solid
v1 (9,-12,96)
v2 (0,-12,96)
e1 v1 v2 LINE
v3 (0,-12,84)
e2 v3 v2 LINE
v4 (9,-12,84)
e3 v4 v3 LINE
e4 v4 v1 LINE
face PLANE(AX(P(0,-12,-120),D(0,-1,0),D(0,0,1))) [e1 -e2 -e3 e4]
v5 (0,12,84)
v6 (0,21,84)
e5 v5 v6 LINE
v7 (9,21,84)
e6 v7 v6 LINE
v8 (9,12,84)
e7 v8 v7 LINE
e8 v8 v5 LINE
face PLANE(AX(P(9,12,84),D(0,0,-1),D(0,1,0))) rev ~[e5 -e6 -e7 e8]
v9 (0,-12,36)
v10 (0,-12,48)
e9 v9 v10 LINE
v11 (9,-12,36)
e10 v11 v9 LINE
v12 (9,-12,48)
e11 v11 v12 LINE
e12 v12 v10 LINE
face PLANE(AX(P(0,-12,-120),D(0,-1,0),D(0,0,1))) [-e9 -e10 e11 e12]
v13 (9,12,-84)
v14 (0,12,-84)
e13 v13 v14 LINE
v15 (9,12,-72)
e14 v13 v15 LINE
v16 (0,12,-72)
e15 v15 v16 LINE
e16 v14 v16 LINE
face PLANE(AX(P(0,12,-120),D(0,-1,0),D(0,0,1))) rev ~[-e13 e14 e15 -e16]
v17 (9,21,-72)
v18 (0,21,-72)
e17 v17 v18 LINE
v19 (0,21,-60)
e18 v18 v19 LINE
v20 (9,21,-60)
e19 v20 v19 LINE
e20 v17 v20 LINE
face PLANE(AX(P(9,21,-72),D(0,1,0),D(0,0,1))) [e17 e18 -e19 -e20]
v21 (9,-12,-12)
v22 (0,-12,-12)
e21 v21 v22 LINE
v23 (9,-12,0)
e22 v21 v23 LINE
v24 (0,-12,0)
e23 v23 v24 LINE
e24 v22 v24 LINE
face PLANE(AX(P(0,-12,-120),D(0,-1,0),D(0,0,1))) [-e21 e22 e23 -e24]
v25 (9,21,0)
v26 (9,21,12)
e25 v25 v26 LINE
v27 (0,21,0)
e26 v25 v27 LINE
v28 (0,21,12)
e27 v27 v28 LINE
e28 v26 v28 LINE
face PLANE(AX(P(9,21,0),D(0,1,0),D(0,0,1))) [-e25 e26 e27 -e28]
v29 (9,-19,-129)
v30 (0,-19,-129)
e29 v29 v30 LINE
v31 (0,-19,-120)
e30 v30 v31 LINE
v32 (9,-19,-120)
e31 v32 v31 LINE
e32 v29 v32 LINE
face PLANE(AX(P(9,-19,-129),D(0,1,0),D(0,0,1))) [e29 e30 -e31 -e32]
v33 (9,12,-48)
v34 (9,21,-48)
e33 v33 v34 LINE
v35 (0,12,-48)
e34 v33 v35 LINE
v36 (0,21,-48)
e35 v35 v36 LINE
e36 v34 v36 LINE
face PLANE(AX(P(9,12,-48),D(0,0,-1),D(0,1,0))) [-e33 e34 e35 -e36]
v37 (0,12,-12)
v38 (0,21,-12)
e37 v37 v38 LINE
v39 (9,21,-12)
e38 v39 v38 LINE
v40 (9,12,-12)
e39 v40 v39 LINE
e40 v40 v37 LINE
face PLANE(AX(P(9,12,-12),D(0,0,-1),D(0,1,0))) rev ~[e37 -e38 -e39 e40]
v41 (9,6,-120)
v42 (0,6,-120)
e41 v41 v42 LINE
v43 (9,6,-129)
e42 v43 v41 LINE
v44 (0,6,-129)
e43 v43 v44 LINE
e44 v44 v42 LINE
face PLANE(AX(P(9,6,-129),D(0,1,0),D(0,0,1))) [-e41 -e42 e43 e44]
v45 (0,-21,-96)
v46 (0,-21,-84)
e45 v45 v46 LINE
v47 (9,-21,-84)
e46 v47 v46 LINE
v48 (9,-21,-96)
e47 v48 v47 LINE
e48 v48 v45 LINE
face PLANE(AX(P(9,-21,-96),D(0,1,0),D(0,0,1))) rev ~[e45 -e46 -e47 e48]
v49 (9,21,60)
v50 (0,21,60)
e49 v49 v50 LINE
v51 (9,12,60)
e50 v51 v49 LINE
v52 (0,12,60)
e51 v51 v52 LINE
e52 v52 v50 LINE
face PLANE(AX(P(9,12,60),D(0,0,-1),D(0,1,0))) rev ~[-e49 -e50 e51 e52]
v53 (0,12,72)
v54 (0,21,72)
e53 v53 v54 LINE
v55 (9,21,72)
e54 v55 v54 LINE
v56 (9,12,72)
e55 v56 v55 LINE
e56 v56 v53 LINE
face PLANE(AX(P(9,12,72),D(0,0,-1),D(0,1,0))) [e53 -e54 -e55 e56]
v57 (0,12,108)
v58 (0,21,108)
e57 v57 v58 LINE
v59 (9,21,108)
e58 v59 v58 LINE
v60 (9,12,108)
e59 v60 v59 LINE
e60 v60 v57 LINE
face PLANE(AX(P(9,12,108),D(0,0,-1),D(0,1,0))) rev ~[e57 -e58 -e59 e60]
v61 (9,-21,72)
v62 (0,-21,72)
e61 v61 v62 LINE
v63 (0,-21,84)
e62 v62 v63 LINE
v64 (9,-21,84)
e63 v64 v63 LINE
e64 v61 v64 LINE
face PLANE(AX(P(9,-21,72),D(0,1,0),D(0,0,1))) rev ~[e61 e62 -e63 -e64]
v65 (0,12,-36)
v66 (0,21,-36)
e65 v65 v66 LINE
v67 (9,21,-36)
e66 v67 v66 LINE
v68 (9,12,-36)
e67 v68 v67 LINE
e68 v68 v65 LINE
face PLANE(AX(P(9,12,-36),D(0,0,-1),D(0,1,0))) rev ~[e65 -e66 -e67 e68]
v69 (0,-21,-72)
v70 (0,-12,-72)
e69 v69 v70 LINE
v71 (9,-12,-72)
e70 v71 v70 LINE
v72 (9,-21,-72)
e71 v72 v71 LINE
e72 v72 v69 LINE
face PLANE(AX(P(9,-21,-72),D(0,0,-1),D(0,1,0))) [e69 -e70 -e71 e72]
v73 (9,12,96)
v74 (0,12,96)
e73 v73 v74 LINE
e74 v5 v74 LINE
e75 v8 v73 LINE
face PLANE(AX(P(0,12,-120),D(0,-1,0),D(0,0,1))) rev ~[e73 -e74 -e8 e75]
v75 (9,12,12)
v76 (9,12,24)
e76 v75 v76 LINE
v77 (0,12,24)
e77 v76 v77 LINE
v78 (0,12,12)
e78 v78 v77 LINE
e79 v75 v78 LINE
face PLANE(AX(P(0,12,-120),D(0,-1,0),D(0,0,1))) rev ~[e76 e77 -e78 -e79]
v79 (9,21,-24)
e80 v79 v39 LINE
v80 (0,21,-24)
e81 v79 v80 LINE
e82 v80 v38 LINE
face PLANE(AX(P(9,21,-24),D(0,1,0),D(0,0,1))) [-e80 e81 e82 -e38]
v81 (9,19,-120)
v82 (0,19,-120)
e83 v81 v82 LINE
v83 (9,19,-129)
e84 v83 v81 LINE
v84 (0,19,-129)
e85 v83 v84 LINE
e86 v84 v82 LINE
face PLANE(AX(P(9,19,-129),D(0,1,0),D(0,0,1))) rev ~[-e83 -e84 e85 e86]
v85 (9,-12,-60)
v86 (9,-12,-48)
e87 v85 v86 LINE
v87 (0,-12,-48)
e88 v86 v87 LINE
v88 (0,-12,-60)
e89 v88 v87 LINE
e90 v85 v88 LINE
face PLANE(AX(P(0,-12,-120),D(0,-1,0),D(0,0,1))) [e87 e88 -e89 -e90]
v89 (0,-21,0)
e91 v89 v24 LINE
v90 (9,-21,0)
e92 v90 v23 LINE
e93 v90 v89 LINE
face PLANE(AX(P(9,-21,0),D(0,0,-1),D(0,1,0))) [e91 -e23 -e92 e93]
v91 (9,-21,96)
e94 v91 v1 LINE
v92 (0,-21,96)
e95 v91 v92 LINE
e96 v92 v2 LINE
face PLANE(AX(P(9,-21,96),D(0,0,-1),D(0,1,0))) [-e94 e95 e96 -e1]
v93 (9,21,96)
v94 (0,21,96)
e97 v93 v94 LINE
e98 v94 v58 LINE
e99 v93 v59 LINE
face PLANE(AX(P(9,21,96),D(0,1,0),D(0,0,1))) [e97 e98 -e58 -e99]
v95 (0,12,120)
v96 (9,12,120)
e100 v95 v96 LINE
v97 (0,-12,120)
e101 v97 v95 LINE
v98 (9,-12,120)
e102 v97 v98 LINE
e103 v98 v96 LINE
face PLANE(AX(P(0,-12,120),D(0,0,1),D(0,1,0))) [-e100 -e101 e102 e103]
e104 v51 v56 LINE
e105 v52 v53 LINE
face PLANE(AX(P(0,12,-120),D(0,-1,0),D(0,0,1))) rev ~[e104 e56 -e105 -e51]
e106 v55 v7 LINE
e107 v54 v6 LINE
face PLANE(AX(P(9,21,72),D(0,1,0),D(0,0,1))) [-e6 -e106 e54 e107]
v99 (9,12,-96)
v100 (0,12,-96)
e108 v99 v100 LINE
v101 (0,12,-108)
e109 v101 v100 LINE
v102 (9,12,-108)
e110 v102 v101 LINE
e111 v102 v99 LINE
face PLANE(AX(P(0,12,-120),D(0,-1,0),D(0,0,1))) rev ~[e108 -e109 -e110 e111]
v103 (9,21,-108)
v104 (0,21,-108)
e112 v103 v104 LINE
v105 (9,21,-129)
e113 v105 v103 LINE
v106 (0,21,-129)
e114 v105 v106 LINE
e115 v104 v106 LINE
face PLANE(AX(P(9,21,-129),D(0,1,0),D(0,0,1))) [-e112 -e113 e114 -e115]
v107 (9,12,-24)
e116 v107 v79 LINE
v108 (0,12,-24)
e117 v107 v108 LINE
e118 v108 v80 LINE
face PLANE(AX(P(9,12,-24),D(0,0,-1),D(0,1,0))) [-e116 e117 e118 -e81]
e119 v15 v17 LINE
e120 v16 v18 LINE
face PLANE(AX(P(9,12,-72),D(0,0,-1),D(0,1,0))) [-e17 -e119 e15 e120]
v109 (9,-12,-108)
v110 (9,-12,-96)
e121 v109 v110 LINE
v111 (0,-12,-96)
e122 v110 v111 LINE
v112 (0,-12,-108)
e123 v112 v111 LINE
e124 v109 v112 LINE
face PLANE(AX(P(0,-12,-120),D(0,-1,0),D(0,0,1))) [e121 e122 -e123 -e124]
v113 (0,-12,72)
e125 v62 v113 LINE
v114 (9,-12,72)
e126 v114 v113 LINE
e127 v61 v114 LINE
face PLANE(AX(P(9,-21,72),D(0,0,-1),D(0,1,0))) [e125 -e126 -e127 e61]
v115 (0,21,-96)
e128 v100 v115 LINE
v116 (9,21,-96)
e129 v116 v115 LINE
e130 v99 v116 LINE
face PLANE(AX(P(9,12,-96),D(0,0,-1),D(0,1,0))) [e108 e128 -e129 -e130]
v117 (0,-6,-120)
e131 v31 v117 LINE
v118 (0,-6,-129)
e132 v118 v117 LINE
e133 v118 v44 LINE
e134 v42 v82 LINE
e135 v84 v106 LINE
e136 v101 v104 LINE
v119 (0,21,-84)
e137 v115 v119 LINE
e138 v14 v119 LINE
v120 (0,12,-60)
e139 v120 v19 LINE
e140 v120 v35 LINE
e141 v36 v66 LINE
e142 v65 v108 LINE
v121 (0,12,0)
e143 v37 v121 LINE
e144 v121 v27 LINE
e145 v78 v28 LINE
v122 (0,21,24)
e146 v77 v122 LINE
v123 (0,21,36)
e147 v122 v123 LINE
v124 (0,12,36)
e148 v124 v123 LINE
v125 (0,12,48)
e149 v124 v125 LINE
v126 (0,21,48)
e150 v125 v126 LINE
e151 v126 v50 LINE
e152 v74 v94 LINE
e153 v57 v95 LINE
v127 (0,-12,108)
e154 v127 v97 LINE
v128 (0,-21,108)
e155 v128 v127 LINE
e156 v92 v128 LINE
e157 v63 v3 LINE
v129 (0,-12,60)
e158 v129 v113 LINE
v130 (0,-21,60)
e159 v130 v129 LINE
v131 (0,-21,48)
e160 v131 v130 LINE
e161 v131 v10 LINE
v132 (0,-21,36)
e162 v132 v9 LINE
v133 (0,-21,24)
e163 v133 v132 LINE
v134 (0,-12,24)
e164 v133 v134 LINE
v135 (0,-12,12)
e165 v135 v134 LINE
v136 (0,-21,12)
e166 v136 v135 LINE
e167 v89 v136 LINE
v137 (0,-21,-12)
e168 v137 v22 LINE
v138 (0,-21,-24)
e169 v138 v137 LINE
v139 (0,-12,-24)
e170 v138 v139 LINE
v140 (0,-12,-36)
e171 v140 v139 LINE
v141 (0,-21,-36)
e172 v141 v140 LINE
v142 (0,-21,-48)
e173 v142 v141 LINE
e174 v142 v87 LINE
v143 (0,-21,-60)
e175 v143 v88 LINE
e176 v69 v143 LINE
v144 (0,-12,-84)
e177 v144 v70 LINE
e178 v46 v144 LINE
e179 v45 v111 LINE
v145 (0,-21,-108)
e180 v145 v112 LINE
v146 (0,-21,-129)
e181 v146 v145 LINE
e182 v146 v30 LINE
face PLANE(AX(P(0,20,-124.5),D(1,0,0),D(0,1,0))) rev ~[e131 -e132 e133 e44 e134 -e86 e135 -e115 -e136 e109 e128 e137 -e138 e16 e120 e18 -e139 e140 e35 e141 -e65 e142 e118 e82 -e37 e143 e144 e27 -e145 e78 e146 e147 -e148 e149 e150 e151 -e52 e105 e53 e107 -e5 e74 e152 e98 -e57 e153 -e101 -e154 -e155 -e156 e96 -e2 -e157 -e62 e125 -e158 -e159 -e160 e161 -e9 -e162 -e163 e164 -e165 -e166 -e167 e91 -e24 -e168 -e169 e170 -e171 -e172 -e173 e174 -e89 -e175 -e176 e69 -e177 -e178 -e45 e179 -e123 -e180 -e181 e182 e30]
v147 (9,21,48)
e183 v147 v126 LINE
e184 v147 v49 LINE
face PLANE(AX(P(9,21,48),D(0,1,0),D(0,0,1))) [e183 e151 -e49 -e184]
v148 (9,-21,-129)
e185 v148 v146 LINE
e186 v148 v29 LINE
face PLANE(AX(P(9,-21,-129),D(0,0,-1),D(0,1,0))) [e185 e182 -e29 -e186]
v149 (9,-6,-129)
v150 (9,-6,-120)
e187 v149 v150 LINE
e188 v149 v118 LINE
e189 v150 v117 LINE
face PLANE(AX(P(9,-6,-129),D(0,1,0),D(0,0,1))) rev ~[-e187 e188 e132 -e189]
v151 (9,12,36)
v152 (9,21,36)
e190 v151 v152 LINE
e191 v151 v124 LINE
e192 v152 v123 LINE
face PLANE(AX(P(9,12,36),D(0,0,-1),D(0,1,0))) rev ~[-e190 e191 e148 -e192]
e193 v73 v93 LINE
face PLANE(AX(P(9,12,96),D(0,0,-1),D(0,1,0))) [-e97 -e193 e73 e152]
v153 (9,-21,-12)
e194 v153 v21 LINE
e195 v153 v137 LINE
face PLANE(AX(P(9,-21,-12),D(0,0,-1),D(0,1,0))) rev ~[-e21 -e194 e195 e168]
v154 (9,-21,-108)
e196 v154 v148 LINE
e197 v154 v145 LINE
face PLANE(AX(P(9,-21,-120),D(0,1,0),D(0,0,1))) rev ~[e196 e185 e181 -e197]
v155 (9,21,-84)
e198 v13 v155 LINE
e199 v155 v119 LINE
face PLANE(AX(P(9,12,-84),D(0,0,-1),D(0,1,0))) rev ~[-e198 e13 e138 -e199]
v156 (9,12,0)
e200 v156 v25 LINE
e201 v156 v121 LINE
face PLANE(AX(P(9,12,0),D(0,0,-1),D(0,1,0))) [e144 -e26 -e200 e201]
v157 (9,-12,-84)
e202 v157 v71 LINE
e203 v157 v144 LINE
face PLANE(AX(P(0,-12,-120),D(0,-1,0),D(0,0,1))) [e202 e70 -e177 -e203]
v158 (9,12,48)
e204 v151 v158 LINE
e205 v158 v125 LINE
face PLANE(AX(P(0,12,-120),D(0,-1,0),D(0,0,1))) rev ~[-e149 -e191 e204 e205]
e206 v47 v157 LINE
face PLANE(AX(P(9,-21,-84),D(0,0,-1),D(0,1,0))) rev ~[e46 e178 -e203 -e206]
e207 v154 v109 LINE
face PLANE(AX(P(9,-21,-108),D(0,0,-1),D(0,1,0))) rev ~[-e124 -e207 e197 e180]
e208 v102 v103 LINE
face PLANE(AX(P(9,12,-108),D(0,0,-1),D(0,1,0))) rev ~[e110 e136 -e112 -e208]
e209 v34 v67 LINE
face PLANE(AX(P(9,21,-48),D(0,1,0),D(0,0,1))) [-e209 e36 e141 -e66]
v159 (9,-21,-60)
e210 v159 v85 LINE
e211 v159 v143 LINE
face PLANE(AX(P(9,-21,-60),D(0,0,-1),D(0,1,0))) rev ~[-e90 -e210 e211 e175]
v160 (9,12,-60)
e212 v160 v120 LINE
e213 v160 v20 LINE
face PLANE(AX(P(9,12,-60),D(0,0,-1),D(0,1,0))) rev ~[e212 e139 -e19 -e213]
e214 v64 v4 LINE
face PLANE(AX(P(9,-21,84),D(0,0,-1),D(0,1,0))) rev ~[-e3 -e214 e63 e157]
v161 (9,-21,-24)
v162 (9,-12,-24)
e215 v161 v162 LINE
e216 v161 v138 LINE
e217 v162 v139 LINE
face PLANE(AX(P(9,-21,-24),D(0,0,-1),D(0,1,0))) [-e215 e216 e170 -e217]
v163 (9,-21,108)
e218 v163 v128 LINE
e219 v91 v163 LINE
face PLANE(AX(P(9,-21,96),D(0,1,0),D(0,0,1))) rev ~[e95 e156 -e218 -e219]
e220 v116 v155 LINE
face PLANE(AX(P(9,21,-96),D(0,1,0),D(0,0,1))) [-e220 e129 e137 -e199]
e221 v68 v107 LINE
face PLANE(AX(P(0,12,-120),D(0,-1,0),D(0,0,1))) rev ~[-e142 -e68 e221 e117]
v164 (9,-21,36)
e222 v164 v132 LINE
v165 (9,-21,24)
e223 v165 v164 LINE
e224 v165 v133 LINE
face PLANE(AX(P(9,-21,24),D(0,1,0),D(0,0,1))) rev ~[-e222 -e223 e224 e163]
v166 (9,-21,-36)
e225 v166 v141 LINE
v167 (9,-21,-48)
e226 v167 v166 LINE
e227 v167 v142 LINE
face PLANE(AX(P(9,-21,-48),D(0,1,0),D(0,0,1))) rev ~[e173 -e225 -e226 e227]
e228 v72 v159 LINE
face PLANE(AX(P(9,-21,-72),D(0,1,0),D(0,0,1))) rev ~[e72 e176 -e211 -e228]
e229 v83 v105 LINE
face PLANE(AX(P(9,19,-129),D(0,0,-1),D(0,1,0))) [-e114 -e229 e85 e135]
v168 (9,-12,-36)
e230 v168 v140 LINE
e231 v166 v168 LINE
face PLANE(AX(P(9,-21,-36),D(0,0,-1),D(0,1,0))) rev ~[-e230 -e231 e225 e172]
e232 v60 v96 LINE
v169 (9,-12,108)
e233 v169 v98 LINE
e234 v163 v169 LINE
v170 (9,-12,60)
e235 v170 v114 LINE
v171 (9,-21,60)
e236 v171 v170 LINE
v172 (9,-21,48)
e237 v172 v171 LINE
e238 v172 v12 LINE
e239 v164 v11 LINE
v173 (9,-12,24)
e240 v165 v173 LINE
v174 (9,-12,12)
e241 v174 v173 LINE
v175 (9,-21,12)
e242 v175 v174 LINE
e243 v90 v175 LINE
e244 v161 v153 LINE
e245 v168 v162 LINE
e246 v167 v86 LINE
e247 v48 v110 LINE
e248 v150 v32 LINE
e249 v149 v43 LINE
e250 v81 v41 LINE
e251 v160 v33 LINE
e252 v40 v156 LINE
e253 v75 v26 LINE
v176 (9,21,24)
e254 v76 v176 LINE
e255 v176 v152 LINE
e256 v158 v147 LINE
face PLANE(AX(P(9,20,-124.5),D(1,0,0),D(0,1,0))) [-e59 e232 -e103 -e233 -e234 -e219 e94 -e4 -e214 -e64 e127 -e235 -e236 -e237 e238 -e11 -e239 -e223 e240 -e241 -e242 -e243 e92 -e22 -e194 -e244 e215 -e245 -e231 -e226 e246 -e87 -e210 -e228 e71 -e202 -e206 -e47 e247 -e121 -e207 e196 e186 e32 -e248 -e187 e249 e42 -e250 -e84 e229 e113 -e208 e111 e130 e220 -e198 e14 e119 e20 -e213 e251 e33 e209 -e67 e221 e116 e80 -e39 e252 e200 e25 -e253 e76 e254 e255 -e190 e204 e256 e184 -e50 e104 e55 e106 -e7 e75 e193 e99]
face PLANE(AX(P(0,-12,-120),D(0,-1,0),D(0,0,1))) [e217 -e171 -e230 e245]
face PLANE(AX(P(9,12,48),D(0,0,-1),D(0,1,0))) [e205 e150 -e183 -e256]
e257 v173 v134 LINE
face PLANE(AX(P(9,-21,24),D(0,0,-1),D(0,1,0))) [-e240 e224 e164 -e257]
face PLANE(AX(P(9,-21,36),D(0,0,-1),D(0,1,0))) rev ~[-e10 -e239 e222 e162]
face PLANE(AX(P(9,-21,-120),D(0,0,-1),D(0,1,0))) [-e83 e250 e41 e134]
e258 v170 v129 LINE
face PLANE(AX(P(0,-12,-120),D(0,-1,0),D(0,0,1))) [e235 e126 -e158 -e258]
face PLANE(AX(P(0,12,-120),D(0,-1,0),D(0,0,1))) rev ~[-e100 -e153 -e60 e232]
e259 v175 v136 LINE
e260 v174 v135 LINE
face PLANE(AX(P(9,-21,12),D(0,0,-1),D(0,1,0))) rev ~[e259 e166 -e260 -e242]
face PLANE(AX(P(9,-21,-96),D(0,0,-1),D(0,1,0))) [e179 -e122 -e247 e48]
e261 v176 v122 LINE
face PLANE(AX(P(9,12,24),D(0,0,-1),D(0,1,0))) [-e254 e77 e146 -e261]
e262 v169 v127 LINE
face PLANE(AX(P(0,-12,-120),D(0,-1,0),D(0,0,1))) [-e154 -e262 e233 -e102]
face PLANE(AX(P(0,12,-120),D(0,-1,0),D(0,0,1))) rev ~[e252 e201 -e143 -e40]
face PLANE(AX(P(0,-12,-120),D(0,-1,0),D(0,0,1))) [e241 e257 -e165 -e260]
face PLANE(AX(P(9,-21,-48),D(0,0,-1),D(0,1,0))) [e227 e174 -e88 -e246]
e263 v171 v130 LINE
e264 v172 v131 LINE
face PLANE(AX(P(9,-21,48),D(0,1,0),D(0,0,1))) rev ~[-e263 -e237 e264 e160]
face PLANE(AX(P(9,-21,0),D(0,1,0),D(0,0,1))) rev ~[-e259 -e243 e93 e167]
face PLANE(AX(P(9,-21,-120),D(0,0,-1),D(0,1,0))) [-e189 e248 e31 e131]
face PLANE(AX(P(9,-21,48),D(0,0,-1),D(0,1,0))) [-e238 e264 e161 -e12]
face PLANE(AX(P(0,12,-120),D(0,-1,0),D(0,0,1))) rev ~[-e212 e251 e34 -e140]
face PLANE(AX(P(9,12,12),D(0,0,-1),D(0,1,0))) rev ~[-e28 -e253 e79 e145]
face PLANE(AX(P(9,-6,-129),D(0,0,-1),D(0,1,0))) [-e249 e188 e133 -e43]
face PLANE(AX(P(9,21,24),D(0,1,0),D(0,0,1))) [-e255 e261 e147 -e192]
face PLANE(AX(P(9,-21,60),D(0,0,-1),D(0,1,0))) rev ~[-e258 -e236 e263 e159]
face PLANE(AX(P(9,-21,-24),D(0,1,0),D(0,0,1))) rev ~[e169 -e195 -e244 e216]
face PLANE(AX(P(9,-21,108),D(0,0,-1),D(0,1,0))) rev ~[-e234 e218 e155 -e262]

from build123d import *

# Parameters (mm, degrees)
F0_W     = 24
F0_H     = 240
F1_DEPTH = 9
F2_W     = 9
F2_H     = 12
F3_DEPTH = 9
F4_W     = 12
F4_H     = 9
F4_W_2   = 2
F5_DEPTH = 9


with BuildPart() as f1:
    # F0 (on Right) → F1 (new body)
    with BuildSketch(Plane.YZ):
        Rectangle(F0_W, F0_H)
    extrude(amount=F1_DEPTH)

    # F2 (on face) → F3 (join, through all)
    with BuildSketch(Plane.YZ.offset(9)):
        with Locations((-16.5, -114)):
            Rectangle(F2_W, F2_H)
        with Locations((-16.5, -90)):
            Rectangle(F2_W, F2_H)
        with Locations((-16.5, -66)):
            Rectangle(F2_W, F2_H)
        with Locations((-16.5, -42)):
            Rectangle(F2_W, F2_H)
        with Locations((-16.5, -18)):
            Rectangle(F2_W, F2_H)
        with Locations((-16.5, 6)):
            Rectangle(F2_W, F2_H)
        with Locations((-16.5, 30)):
            Rectangle(F2_W, F2_H)
        with Locations((-16.5, 54)):
            Rectangle(F2_W, F2_H)
        with Locations((-16.5, 78)):
            Rectangle(F2_W, F2_H)
        with Locations((-16.5, 102)):
            Rectangle(F2_W, F2_H)
        with Locations((16.5, -90)):
            Rectangle(F2_W, F2_H)
        with Locations((16.5, 30)):
            Rectangle(F2_W, F2_H)
        with Locations((16.5, 102)):
            Rectangle(F2_W, F2_H)
        with Locations((16.5, -18)):
            Rectangle(F2_W, F2_H)
        with Locations((16.5, 78)):
            Rectangle(F2_W, F2_H)
        with Locations((16.5, 6)):
            Rectangle(F2_W, F2_H)
        with Locations((16.5, 54)):
            Rectangle(F2_W, F2_H)
        with Locations((16.5, -42)):
            Rectangle(F2_W, F2_H)
        with Locations((16.5, -66)):
            Rectangle(F2_W, F2_H)
        with Locations((16.5, -114)):
            Rectangle(F2_W, F2_H)
    extrude(amount=-F3_DEPTH)

    # F4 (on face) → F5 (join, through all)
    with BuildSketch(Plane.YZ.offset(9)):
        with Locations((0, -124.5)):
            Rectangle(F4_W, F4_H)
        with Locations((20, -124.5)):
            Rectangle(F4_W_2, F4_H)
        with Locations((-20, -124.5)):
            Rectangle(F4_W_2, F4_H)
    extrude(amount=-F5_DEPTH)


solid = f1.part
